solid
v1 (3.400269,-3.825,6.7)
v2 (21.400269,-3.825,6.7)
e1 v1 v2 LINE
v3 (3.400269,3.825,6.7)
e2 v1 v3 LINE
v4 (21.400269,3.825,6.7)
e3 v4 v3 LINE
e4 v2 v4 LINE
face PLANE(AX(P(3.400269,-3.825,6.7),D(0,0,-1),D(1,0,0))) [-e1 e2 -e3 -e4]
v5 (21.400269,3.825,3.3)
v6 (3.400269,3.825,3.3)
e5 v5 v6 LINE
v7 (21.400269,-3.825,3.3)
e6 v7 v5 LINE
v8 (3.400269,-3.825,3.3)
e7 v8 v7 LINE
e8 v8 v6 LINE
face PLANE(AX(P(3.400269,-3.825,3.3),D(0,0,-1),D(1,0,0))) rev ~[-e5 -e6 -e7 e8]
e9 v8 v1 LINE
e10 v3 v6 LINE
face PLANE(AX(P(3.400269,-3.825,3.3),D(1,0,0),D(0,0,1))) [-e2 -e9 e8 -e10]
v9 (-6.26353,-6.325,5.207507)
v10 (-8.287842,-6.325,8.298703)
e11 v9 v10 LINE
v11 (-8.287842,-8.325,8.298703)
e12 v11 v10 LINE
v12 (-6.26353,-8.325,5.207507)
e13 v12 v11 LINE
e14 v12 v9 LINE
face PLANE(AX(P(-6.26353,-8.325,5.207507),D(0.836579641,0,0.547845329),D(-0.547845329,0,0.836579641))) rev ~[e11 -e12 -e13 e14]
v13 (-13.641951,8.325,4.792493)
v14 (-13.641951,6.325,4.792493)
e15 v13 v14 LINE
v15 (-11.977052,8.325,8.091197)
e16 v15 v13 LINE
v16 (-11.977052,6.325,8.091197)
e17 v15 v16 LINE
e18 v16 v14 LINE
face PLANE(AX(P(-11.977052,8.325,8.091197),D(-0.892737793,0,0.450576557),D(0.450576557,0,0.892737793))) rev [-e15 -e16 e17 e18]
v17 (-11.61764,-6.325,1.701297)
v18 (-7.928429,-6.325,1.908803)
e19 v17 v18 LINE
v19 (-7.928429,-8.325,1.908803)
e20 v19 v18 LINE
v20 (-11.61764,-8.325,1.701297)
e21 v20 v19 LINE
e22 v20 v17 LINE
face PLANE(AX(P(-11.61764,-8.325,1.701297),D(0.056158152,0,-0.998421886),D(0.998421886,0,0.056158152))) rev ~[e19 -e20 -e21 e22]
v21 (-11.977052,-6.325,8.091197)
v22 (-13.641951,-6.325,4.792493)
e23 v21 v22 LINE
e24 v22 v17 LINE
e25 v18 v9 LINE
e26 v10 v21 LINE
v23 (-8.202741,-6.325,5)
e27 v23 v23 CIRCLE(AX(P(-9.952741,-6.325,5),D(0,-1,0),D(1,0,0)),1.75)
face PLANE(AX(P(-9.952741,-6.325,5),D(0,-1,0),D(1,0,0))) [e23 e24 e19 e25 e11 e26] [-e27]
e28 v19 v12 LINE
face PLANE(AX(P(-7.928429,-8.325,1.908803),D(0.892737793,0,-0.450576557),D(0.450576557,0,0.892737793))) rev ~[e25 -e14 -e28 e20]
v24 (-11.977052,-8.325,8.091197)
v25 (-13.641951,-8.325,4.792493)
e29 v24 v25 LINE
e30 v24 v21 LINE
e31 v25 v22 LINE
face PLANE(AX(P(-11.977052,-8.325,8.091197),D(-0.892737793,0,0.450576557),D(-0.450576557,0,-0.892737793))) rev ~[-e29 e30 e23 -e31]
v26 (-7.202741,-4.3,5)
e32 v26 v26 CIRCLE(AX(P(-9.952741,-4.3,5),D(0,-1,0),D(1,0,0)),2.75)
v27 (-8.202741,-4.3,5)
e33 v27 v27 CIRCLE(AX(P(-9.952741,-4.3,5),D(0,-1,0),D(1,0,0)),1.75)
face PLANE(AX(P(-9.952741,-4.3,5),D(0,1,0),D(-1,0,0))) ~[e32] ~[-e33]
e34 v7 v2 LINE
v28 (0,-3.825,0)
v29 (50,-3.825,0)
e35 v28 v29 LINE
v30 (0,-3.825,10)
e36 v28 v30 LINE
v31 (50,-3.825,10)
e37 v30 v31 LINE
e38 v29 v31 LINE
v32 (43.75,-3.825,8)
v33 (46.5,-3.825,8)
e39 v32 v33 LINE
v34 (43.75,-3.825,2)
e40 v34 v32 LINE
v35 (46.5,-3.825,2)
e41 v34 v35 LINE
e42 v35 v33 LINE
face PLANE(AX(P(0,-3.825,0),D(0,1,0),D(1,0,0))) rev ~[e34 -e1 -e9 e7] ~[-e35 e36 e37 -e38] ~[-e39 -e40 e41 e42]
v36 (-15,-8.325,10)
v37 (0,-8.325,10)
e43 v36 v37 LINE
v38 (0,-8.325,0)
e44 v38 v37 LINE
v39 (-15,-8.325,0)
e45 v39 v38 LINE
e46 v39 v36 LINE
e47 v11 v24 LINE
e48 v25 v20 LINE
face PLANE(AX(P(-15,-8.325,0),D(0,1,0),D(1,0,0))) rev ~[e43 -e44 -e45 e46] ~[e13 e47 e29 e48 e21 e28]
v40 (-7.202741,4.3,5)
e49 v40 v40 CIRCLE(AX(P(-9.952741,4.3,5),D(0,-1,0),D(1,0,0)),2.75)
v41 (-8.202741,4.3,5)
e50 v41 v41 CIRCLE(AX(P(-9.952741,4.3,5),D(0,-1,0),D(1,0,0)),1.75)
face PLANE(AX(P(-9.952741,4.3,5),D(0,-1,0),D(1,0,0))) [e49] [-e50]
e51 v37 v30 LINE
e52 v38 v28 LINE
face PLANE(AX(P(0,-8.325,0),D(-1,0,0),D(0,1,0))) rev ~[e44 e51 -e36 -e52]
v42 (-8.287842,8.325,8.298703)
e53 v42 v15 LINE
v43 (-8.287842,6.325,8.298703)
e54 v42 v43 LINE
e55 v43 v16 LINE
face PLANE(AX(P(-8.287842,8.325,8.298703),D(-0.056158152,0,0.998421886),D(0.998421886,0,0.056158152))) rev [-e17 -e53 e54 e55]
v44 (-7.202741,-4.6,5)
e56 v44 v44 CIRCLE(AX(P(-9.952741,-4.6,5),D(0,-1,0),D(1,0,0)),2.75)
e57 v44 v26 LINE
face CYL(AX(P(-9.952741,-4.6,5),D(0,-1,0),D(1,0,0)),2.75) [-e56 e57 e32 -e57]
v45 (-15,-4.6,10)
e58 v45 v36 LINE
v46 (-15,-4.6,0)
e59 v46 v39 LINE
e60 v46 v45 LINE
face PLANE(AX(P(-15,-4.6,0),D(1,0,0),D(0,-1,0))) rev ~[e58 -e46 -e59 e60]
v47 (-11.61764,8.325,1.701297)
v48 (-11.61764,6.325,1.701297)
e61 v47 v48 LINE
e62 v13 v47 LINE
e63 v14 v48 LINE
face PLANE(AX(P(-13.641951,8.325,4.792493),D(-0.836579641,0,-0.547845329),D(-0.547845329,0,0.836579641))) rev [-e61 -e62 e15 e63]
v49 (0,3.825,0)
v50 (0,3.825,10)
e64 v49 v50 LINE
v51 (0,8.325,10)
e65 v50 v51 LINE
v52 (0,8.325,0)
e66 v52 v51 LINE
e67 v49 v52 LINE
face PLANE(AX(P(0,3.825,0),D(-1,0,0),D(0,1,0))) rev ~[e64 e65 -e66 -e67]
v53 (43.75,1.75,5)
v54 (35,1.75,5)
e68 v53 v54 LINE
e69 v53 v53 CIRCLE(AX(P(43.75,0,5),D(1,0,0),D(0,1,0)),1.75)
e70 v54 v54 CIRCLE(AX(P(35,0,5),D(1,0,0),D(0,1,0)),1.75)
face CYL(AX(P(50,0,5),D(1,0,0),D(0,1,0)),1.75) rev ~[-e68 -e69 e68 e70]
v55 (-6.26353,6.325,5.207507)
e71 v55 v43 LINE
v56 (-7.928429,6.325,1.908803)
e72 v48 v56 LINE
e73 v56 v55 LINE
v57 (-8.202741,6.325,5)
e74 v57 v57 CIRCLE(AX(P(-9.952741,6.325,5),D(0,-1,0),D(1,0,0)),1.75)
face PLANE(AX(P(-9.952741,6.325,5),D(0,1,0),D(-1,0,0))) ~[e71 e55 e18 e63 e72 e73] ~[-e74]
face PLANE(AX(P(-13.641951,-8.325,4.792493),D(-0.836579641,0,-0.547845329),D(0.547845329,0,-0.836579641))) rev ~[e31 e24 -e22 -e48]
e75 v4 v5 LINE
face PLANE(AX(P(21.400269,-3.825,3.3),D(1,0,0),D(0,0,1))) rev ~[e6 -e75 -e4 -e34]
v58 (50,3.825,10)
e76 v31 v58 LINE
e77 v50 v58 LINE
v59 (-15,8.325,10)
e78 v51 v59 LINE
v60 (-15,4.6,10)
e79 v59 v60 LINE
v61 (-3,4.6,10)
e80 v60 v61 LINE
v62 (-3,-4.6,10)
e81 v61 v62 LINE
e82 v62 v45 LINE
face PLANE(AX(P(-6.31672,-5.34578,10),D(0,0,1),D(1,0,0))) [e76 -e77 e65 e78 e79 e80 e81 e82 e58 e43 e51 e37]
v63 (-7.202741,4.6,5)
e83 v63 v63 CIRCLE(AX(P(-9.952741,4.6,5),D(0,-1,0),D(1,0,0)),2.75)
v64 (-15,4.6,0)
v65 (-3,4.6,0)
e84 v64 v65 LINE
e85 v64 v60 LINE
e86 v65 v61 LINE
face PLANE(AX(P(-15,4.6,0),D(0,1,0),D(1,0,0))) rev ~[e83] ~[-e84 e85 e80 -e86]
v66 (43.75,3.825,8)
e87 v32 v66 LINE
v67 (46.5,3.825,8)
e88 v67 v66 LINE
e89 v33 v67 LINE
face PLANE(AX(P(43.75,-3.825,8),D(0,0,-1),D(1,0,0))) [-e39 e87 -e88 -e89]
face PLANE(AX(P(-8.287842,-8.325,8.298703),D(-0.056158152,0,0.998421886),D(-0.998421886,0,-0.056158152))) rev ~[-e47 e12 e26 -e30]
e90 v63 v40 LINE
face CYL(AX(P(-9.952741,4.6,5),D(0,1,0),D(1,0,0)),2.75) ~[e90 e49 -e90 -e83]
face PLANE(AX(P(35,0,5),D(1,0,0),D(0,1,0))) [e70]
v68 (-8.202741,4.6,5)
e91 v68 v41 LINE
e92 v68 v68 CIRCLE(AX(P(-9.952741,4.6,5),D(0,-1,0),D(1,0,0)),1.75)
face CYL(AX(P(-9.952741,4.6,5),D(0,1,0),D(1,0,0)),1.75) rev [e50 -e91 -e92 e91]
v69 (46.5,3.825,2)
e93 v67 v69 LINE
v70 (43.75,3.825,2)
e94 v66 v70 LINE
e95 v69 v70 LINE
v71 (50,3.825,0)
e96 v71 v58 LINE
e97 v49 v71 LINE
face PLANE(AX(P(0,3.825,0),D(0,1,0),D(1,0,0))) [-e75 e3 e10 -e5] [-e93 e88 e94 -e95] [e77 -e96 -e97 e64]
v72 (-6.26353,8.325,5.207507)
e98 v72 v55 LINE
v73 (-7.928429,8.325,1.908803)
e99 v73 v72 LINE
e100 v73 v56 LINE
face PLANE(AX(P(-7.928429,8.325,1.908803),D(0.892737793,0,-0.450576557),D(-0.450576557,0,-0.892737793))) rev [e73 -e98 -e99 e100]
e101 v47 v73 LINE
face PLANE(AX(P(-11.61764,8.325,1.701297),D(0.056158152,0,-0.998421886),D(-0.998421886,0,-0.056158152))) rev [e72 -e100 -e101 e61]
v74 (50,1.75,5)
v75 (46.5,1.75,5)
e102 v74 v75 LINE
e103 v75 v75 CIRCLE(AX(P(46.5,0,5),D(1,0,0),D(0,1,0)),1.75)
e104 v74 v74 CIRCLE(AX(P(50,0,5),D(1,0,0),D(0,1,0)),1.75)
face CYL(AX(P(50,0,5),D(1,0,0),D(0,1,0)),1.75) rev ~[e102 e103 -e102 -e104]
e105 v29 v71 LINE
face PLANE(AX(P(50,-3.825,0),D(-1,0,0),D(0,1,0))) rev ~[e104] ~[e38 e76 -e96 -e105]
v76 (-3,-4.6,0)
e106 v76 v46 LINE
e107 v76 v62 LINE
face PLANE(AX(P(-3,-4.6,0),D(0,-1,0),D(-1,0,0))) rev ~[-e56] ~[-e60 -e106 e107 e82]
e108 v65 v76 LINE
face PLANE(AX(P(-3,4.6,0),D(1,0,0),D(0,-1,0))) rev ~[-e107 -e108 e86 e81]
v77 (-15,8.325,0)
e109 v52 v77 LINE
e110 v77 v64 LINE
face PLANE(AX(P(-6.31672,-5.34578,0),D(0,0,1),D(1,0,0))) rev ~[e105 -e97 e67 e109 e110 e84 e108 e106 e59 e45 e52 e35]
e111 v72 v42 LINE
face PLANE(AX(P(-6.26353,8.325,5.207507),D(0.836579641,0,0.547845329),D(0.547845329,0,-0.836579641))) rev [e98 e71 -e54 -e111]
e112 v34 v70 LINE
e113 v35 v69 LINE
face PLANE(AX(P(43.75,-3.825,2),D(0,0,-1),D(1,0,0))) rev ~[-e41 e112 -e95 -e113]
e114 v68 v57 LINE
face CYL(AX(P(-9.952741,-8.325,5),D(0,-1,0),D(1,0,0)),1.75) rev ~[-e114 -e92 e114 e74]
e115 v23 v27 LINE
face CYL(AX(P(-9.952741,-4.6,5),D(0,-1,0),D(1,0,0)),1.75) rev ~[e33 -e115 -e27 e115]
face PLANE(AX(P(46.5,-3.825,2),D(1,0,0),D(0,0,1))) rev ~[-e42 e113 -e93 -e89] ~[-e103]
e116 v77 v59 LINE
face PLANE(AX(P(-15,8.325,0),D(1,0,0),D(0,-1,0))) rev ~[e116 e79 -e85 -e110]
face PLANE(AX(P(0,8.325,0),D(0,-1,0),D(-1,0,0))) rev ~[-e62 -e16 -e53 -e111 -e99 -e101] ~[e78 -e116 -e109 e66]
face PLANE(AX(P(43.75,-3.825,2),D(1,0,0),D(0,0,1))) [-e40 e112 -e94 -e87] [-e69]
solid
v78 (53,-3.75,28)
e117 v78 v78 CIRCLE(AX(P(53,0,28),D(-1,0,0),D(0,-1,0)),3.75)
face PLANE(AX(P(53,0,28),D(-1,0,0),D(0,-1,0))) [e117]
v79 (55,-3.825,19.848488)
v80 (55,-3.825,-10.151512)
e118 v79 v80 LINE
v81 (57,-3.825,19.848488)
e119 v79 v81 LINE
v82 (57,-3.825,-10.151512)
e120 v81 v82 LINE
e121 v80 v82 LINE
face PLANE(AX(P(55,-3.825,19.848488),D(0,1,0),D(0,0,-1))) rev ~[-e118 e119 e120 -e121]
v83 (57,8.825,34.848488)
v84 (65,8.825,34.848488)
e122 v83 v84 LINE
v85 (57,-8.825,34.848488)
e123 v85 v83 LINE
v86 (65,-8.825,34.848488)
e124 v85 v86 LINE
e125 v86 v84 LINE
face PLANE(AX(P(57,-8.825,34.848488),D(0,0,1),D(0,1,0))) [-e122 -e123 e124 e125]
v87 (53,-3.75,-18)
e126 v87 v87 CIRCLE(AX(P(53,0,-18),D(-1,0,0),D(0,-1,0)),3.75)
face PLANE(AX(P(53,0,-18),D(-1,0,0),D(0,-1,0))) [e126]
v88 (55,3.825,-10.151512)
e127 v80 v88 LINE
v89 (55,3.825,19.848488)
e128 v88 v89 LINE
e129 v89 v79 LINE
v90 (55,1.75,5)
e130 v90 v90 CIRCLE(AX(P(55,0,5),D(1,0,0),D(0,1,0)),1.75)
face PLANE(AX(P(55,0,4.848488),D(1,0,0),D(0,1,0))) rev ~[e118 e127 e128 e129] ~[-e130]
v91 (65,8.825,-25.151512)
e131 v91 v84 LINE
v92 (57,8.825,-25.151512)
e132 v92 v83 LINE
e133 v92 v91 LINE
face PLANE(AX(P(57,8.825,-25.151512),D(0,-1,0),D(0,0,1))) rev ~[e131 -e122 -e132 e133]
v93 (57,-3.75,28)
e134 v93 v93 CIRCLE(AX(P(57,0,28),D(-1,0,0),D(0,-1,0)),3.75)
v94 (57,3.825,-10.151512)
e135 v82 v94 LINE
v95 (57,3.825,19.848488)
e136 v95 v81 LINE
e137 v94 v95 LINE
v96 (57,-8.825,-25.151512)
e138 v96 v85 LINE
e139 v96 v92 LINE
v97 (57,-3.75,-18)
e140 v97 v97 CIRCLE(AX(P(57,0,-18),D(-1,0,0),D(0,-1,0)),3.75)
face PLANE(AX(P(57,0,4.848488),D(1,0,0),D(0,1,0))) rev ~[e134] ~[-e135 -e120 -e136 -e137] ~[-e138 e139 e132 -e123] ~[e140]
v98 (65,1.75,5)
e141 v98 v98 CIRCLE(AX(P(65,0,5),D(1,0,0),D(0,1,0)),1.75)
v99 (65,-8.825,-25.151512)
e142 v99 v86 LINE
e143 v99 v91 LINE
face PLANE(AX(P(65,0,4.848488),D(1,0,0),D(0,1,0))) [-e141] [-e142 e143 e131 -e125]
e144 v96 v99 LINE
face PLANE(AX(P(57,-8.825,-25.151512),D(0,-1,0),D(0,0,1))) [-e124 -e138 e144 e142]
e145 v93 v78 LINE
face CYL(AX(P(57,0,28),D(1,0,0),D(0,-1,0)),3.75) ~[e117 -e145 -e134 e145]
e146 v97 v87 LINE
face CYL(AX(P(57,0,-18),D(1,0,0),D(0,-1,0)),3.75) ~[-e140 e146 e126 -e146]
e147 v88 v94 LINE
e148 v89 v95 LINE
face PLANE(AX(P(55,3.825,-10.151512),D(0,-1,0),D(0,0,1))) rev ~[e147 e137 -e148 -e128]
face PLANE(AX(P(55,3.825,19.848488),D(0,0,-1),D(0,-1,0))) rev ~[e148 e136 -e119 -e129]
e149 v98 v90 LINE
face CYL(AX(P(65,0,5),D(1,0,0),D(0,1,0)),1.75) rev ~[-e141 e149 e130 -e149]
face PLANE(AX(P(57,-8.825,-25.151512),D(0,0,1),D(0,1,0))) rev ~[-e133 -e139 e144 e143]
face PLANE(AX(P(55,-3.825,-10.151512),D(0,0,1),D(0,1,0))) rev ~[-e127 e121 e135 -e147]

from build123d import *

# Parameters (mm, degrees)
F0_W      = 50
F0_H      = 3.825
F1_DEPTH  = 10
F2_R      = 1.75
F3_DEPTH  = 16.651
F4_W      = 18
F4_H      = 3.4
F4_W_2    = 2.75
F4_H_2    = 6
F5_DEPTH  = 12.151
F6_R      = 1.75
F7_DEPTH  = 15
F10_DEPTH = 2
F11_W     = 17.65
F11_H     = 60
F12_DEPTH = 8
F13_R     = 1.75
F14_DEPTH = 80.001
F15_R     = 2.75
F15_R_2   = 1.75
F16_DEPTH = 0.3
F17_R     = 1.75
F18_DEPTH = 2
F19_R     = 3.75
F20_DEPTH = 4


# Not quite as in the source:
# - a pattern or mirror of a feature is missing from the dataset's text; its kind, count and spacing are read off the source's solid


with BuildPart() as f1:
    # F0 (on Top) → F1 (new body)
    with BuildSketch(Plane.XY):
        Polygon((0, -3.825), (0, 0), (-3, 0), (-3, -4.6), (-15, -4.6), (-15, -8.325), (0, -8.325), align=None)
        Polygon((-3, 0), (0, 0), (0, 3.825), (0, 8.325), (-15, 8.325), (-15, 4.6), (-3, 4.6), align=None)
        with Locations((25, 1.9125)):
            Rectangle(F0_W, F0_H)
        with Locations((25, -1.9125)):
            Rectangle(F0_W, F0_H)
    extrude(amount=F1_DEPTH)

    # F2 (on face) → F3 (cut, through all)
    with BuildSketch(Plane.XZ.offset(8.325)):
        with Locations((-9.9527407438, 5)):
            Circle(F2_R)
    extrude(amount=-F3_DEPTH, mode=Mode.SUBTRACT)

    # F4 (on face) → F5 (cut, through all)
    with BuildSketch(Plane.XZ.offset(3.825)):
        with Locations((12.4002694301, 5)):
            Rectangle(F4_W, F4_H)
        with Locations((45.125, 5)):
            Rectangle(F4_W_2, F4_H_2)
    extrude(amount=-F5_DEPTH, mode=Mode.SUBTRACT)

    # F6 (on face) → F7 (cut)
    with BuildSketch(Plane.YZ.offset(50)):
        with Locations((0, 5)):
            Circle(F6_R)
    extrude(amount=-F7_DEPTH, mode=Mode.SUBTRACT)

    # F15 (on face) → F16 (join)
    with BuildSketch(Plane.XZ.offset(-4.6)):
        with Locations((-9.9527407438, 5)):
            Circle(F15_R)
        with Locations((-9.9527407438, 5)):
            Circle(F15_R_2, mode=Mode.SUBTRACT)
    f16 = extrude(amount=F16_DEPTH)

    # F16_copies: F16 across plane
    add(f16.mirror(Plane(origin=(0, 0, 0), x_dir=(0, 0, -1), z_dir=(0, -1, 0))))

    # F17 (on face) → F18 (cut)
    with BuildSketch(Plane.XZ.offset(8.325)):
        Polygon((-7.9284293953, 1.9088033227), (-6.2635302189, 5.2075067143), (-8.2878415673, 8.2987033916), (-11.9770520922, 8.0911966773), (-13.6419512686, 4.7924932857), (-11.6176399202, 1.7012966084), align=None)
        with Locations((-9.9527407438, 5)):
            Circle(F17_R, mode=Mode.SUBTRACT)
    f18 = extrude(amount=-F18_DEPTH, mode=Mode.SUBTRACT)

    # F18_copies: F18 across plane
    add(f18.mirror(Plane.ZX), mode=Mode.SUBTRACT)


with BuildPart() as f10:
    # F9 (on offset) → F10 (new body)
    with BuildSketch(Plane.YZ.offset(55)):
        Polygon((3.825, 0), (3.825, 10), (3.825, 19.8484882712), (-3.825, 19.8484882712), (-3.825, 10), (-3.825, 0), (-3.825, -10.1515117288), (3.825, -10.1515117288), align=None)
    extrude(amount=F10_DEPTH)

    # F11 (on face) → F12 (join)
    with BuildSketch(Plane.YZ.offset(57)):
        with Locations((0, 4.8484882712)):
            Rectangle(F11_W, F11_H)
    extrude(amount=F12_DEPTH)

    # F13 (on face) → F14 (cut, through all)
    with BuildSketch(Plane.YZ.offset(65)):
        with Locations((0, 5)):
            Circle(F13_R)
    extrude(amount=-F14_DEPTH, mode=Mode.SUBTRACT)

    # F19 (on face) → F20 (join)
    with BuildSketch(Plane(origin=(57, 0, 0), x_dir=(0, -1, 0), z_dir=(-1, 0, 0))):
        with Locations((0, 28)):
            Circle(F19_R)
        with Locations((0, -18)):
            Circle(F19_R)
    extrude(amount=F20_DEPTH)


solid = Compound([f1.part, f10.part])
